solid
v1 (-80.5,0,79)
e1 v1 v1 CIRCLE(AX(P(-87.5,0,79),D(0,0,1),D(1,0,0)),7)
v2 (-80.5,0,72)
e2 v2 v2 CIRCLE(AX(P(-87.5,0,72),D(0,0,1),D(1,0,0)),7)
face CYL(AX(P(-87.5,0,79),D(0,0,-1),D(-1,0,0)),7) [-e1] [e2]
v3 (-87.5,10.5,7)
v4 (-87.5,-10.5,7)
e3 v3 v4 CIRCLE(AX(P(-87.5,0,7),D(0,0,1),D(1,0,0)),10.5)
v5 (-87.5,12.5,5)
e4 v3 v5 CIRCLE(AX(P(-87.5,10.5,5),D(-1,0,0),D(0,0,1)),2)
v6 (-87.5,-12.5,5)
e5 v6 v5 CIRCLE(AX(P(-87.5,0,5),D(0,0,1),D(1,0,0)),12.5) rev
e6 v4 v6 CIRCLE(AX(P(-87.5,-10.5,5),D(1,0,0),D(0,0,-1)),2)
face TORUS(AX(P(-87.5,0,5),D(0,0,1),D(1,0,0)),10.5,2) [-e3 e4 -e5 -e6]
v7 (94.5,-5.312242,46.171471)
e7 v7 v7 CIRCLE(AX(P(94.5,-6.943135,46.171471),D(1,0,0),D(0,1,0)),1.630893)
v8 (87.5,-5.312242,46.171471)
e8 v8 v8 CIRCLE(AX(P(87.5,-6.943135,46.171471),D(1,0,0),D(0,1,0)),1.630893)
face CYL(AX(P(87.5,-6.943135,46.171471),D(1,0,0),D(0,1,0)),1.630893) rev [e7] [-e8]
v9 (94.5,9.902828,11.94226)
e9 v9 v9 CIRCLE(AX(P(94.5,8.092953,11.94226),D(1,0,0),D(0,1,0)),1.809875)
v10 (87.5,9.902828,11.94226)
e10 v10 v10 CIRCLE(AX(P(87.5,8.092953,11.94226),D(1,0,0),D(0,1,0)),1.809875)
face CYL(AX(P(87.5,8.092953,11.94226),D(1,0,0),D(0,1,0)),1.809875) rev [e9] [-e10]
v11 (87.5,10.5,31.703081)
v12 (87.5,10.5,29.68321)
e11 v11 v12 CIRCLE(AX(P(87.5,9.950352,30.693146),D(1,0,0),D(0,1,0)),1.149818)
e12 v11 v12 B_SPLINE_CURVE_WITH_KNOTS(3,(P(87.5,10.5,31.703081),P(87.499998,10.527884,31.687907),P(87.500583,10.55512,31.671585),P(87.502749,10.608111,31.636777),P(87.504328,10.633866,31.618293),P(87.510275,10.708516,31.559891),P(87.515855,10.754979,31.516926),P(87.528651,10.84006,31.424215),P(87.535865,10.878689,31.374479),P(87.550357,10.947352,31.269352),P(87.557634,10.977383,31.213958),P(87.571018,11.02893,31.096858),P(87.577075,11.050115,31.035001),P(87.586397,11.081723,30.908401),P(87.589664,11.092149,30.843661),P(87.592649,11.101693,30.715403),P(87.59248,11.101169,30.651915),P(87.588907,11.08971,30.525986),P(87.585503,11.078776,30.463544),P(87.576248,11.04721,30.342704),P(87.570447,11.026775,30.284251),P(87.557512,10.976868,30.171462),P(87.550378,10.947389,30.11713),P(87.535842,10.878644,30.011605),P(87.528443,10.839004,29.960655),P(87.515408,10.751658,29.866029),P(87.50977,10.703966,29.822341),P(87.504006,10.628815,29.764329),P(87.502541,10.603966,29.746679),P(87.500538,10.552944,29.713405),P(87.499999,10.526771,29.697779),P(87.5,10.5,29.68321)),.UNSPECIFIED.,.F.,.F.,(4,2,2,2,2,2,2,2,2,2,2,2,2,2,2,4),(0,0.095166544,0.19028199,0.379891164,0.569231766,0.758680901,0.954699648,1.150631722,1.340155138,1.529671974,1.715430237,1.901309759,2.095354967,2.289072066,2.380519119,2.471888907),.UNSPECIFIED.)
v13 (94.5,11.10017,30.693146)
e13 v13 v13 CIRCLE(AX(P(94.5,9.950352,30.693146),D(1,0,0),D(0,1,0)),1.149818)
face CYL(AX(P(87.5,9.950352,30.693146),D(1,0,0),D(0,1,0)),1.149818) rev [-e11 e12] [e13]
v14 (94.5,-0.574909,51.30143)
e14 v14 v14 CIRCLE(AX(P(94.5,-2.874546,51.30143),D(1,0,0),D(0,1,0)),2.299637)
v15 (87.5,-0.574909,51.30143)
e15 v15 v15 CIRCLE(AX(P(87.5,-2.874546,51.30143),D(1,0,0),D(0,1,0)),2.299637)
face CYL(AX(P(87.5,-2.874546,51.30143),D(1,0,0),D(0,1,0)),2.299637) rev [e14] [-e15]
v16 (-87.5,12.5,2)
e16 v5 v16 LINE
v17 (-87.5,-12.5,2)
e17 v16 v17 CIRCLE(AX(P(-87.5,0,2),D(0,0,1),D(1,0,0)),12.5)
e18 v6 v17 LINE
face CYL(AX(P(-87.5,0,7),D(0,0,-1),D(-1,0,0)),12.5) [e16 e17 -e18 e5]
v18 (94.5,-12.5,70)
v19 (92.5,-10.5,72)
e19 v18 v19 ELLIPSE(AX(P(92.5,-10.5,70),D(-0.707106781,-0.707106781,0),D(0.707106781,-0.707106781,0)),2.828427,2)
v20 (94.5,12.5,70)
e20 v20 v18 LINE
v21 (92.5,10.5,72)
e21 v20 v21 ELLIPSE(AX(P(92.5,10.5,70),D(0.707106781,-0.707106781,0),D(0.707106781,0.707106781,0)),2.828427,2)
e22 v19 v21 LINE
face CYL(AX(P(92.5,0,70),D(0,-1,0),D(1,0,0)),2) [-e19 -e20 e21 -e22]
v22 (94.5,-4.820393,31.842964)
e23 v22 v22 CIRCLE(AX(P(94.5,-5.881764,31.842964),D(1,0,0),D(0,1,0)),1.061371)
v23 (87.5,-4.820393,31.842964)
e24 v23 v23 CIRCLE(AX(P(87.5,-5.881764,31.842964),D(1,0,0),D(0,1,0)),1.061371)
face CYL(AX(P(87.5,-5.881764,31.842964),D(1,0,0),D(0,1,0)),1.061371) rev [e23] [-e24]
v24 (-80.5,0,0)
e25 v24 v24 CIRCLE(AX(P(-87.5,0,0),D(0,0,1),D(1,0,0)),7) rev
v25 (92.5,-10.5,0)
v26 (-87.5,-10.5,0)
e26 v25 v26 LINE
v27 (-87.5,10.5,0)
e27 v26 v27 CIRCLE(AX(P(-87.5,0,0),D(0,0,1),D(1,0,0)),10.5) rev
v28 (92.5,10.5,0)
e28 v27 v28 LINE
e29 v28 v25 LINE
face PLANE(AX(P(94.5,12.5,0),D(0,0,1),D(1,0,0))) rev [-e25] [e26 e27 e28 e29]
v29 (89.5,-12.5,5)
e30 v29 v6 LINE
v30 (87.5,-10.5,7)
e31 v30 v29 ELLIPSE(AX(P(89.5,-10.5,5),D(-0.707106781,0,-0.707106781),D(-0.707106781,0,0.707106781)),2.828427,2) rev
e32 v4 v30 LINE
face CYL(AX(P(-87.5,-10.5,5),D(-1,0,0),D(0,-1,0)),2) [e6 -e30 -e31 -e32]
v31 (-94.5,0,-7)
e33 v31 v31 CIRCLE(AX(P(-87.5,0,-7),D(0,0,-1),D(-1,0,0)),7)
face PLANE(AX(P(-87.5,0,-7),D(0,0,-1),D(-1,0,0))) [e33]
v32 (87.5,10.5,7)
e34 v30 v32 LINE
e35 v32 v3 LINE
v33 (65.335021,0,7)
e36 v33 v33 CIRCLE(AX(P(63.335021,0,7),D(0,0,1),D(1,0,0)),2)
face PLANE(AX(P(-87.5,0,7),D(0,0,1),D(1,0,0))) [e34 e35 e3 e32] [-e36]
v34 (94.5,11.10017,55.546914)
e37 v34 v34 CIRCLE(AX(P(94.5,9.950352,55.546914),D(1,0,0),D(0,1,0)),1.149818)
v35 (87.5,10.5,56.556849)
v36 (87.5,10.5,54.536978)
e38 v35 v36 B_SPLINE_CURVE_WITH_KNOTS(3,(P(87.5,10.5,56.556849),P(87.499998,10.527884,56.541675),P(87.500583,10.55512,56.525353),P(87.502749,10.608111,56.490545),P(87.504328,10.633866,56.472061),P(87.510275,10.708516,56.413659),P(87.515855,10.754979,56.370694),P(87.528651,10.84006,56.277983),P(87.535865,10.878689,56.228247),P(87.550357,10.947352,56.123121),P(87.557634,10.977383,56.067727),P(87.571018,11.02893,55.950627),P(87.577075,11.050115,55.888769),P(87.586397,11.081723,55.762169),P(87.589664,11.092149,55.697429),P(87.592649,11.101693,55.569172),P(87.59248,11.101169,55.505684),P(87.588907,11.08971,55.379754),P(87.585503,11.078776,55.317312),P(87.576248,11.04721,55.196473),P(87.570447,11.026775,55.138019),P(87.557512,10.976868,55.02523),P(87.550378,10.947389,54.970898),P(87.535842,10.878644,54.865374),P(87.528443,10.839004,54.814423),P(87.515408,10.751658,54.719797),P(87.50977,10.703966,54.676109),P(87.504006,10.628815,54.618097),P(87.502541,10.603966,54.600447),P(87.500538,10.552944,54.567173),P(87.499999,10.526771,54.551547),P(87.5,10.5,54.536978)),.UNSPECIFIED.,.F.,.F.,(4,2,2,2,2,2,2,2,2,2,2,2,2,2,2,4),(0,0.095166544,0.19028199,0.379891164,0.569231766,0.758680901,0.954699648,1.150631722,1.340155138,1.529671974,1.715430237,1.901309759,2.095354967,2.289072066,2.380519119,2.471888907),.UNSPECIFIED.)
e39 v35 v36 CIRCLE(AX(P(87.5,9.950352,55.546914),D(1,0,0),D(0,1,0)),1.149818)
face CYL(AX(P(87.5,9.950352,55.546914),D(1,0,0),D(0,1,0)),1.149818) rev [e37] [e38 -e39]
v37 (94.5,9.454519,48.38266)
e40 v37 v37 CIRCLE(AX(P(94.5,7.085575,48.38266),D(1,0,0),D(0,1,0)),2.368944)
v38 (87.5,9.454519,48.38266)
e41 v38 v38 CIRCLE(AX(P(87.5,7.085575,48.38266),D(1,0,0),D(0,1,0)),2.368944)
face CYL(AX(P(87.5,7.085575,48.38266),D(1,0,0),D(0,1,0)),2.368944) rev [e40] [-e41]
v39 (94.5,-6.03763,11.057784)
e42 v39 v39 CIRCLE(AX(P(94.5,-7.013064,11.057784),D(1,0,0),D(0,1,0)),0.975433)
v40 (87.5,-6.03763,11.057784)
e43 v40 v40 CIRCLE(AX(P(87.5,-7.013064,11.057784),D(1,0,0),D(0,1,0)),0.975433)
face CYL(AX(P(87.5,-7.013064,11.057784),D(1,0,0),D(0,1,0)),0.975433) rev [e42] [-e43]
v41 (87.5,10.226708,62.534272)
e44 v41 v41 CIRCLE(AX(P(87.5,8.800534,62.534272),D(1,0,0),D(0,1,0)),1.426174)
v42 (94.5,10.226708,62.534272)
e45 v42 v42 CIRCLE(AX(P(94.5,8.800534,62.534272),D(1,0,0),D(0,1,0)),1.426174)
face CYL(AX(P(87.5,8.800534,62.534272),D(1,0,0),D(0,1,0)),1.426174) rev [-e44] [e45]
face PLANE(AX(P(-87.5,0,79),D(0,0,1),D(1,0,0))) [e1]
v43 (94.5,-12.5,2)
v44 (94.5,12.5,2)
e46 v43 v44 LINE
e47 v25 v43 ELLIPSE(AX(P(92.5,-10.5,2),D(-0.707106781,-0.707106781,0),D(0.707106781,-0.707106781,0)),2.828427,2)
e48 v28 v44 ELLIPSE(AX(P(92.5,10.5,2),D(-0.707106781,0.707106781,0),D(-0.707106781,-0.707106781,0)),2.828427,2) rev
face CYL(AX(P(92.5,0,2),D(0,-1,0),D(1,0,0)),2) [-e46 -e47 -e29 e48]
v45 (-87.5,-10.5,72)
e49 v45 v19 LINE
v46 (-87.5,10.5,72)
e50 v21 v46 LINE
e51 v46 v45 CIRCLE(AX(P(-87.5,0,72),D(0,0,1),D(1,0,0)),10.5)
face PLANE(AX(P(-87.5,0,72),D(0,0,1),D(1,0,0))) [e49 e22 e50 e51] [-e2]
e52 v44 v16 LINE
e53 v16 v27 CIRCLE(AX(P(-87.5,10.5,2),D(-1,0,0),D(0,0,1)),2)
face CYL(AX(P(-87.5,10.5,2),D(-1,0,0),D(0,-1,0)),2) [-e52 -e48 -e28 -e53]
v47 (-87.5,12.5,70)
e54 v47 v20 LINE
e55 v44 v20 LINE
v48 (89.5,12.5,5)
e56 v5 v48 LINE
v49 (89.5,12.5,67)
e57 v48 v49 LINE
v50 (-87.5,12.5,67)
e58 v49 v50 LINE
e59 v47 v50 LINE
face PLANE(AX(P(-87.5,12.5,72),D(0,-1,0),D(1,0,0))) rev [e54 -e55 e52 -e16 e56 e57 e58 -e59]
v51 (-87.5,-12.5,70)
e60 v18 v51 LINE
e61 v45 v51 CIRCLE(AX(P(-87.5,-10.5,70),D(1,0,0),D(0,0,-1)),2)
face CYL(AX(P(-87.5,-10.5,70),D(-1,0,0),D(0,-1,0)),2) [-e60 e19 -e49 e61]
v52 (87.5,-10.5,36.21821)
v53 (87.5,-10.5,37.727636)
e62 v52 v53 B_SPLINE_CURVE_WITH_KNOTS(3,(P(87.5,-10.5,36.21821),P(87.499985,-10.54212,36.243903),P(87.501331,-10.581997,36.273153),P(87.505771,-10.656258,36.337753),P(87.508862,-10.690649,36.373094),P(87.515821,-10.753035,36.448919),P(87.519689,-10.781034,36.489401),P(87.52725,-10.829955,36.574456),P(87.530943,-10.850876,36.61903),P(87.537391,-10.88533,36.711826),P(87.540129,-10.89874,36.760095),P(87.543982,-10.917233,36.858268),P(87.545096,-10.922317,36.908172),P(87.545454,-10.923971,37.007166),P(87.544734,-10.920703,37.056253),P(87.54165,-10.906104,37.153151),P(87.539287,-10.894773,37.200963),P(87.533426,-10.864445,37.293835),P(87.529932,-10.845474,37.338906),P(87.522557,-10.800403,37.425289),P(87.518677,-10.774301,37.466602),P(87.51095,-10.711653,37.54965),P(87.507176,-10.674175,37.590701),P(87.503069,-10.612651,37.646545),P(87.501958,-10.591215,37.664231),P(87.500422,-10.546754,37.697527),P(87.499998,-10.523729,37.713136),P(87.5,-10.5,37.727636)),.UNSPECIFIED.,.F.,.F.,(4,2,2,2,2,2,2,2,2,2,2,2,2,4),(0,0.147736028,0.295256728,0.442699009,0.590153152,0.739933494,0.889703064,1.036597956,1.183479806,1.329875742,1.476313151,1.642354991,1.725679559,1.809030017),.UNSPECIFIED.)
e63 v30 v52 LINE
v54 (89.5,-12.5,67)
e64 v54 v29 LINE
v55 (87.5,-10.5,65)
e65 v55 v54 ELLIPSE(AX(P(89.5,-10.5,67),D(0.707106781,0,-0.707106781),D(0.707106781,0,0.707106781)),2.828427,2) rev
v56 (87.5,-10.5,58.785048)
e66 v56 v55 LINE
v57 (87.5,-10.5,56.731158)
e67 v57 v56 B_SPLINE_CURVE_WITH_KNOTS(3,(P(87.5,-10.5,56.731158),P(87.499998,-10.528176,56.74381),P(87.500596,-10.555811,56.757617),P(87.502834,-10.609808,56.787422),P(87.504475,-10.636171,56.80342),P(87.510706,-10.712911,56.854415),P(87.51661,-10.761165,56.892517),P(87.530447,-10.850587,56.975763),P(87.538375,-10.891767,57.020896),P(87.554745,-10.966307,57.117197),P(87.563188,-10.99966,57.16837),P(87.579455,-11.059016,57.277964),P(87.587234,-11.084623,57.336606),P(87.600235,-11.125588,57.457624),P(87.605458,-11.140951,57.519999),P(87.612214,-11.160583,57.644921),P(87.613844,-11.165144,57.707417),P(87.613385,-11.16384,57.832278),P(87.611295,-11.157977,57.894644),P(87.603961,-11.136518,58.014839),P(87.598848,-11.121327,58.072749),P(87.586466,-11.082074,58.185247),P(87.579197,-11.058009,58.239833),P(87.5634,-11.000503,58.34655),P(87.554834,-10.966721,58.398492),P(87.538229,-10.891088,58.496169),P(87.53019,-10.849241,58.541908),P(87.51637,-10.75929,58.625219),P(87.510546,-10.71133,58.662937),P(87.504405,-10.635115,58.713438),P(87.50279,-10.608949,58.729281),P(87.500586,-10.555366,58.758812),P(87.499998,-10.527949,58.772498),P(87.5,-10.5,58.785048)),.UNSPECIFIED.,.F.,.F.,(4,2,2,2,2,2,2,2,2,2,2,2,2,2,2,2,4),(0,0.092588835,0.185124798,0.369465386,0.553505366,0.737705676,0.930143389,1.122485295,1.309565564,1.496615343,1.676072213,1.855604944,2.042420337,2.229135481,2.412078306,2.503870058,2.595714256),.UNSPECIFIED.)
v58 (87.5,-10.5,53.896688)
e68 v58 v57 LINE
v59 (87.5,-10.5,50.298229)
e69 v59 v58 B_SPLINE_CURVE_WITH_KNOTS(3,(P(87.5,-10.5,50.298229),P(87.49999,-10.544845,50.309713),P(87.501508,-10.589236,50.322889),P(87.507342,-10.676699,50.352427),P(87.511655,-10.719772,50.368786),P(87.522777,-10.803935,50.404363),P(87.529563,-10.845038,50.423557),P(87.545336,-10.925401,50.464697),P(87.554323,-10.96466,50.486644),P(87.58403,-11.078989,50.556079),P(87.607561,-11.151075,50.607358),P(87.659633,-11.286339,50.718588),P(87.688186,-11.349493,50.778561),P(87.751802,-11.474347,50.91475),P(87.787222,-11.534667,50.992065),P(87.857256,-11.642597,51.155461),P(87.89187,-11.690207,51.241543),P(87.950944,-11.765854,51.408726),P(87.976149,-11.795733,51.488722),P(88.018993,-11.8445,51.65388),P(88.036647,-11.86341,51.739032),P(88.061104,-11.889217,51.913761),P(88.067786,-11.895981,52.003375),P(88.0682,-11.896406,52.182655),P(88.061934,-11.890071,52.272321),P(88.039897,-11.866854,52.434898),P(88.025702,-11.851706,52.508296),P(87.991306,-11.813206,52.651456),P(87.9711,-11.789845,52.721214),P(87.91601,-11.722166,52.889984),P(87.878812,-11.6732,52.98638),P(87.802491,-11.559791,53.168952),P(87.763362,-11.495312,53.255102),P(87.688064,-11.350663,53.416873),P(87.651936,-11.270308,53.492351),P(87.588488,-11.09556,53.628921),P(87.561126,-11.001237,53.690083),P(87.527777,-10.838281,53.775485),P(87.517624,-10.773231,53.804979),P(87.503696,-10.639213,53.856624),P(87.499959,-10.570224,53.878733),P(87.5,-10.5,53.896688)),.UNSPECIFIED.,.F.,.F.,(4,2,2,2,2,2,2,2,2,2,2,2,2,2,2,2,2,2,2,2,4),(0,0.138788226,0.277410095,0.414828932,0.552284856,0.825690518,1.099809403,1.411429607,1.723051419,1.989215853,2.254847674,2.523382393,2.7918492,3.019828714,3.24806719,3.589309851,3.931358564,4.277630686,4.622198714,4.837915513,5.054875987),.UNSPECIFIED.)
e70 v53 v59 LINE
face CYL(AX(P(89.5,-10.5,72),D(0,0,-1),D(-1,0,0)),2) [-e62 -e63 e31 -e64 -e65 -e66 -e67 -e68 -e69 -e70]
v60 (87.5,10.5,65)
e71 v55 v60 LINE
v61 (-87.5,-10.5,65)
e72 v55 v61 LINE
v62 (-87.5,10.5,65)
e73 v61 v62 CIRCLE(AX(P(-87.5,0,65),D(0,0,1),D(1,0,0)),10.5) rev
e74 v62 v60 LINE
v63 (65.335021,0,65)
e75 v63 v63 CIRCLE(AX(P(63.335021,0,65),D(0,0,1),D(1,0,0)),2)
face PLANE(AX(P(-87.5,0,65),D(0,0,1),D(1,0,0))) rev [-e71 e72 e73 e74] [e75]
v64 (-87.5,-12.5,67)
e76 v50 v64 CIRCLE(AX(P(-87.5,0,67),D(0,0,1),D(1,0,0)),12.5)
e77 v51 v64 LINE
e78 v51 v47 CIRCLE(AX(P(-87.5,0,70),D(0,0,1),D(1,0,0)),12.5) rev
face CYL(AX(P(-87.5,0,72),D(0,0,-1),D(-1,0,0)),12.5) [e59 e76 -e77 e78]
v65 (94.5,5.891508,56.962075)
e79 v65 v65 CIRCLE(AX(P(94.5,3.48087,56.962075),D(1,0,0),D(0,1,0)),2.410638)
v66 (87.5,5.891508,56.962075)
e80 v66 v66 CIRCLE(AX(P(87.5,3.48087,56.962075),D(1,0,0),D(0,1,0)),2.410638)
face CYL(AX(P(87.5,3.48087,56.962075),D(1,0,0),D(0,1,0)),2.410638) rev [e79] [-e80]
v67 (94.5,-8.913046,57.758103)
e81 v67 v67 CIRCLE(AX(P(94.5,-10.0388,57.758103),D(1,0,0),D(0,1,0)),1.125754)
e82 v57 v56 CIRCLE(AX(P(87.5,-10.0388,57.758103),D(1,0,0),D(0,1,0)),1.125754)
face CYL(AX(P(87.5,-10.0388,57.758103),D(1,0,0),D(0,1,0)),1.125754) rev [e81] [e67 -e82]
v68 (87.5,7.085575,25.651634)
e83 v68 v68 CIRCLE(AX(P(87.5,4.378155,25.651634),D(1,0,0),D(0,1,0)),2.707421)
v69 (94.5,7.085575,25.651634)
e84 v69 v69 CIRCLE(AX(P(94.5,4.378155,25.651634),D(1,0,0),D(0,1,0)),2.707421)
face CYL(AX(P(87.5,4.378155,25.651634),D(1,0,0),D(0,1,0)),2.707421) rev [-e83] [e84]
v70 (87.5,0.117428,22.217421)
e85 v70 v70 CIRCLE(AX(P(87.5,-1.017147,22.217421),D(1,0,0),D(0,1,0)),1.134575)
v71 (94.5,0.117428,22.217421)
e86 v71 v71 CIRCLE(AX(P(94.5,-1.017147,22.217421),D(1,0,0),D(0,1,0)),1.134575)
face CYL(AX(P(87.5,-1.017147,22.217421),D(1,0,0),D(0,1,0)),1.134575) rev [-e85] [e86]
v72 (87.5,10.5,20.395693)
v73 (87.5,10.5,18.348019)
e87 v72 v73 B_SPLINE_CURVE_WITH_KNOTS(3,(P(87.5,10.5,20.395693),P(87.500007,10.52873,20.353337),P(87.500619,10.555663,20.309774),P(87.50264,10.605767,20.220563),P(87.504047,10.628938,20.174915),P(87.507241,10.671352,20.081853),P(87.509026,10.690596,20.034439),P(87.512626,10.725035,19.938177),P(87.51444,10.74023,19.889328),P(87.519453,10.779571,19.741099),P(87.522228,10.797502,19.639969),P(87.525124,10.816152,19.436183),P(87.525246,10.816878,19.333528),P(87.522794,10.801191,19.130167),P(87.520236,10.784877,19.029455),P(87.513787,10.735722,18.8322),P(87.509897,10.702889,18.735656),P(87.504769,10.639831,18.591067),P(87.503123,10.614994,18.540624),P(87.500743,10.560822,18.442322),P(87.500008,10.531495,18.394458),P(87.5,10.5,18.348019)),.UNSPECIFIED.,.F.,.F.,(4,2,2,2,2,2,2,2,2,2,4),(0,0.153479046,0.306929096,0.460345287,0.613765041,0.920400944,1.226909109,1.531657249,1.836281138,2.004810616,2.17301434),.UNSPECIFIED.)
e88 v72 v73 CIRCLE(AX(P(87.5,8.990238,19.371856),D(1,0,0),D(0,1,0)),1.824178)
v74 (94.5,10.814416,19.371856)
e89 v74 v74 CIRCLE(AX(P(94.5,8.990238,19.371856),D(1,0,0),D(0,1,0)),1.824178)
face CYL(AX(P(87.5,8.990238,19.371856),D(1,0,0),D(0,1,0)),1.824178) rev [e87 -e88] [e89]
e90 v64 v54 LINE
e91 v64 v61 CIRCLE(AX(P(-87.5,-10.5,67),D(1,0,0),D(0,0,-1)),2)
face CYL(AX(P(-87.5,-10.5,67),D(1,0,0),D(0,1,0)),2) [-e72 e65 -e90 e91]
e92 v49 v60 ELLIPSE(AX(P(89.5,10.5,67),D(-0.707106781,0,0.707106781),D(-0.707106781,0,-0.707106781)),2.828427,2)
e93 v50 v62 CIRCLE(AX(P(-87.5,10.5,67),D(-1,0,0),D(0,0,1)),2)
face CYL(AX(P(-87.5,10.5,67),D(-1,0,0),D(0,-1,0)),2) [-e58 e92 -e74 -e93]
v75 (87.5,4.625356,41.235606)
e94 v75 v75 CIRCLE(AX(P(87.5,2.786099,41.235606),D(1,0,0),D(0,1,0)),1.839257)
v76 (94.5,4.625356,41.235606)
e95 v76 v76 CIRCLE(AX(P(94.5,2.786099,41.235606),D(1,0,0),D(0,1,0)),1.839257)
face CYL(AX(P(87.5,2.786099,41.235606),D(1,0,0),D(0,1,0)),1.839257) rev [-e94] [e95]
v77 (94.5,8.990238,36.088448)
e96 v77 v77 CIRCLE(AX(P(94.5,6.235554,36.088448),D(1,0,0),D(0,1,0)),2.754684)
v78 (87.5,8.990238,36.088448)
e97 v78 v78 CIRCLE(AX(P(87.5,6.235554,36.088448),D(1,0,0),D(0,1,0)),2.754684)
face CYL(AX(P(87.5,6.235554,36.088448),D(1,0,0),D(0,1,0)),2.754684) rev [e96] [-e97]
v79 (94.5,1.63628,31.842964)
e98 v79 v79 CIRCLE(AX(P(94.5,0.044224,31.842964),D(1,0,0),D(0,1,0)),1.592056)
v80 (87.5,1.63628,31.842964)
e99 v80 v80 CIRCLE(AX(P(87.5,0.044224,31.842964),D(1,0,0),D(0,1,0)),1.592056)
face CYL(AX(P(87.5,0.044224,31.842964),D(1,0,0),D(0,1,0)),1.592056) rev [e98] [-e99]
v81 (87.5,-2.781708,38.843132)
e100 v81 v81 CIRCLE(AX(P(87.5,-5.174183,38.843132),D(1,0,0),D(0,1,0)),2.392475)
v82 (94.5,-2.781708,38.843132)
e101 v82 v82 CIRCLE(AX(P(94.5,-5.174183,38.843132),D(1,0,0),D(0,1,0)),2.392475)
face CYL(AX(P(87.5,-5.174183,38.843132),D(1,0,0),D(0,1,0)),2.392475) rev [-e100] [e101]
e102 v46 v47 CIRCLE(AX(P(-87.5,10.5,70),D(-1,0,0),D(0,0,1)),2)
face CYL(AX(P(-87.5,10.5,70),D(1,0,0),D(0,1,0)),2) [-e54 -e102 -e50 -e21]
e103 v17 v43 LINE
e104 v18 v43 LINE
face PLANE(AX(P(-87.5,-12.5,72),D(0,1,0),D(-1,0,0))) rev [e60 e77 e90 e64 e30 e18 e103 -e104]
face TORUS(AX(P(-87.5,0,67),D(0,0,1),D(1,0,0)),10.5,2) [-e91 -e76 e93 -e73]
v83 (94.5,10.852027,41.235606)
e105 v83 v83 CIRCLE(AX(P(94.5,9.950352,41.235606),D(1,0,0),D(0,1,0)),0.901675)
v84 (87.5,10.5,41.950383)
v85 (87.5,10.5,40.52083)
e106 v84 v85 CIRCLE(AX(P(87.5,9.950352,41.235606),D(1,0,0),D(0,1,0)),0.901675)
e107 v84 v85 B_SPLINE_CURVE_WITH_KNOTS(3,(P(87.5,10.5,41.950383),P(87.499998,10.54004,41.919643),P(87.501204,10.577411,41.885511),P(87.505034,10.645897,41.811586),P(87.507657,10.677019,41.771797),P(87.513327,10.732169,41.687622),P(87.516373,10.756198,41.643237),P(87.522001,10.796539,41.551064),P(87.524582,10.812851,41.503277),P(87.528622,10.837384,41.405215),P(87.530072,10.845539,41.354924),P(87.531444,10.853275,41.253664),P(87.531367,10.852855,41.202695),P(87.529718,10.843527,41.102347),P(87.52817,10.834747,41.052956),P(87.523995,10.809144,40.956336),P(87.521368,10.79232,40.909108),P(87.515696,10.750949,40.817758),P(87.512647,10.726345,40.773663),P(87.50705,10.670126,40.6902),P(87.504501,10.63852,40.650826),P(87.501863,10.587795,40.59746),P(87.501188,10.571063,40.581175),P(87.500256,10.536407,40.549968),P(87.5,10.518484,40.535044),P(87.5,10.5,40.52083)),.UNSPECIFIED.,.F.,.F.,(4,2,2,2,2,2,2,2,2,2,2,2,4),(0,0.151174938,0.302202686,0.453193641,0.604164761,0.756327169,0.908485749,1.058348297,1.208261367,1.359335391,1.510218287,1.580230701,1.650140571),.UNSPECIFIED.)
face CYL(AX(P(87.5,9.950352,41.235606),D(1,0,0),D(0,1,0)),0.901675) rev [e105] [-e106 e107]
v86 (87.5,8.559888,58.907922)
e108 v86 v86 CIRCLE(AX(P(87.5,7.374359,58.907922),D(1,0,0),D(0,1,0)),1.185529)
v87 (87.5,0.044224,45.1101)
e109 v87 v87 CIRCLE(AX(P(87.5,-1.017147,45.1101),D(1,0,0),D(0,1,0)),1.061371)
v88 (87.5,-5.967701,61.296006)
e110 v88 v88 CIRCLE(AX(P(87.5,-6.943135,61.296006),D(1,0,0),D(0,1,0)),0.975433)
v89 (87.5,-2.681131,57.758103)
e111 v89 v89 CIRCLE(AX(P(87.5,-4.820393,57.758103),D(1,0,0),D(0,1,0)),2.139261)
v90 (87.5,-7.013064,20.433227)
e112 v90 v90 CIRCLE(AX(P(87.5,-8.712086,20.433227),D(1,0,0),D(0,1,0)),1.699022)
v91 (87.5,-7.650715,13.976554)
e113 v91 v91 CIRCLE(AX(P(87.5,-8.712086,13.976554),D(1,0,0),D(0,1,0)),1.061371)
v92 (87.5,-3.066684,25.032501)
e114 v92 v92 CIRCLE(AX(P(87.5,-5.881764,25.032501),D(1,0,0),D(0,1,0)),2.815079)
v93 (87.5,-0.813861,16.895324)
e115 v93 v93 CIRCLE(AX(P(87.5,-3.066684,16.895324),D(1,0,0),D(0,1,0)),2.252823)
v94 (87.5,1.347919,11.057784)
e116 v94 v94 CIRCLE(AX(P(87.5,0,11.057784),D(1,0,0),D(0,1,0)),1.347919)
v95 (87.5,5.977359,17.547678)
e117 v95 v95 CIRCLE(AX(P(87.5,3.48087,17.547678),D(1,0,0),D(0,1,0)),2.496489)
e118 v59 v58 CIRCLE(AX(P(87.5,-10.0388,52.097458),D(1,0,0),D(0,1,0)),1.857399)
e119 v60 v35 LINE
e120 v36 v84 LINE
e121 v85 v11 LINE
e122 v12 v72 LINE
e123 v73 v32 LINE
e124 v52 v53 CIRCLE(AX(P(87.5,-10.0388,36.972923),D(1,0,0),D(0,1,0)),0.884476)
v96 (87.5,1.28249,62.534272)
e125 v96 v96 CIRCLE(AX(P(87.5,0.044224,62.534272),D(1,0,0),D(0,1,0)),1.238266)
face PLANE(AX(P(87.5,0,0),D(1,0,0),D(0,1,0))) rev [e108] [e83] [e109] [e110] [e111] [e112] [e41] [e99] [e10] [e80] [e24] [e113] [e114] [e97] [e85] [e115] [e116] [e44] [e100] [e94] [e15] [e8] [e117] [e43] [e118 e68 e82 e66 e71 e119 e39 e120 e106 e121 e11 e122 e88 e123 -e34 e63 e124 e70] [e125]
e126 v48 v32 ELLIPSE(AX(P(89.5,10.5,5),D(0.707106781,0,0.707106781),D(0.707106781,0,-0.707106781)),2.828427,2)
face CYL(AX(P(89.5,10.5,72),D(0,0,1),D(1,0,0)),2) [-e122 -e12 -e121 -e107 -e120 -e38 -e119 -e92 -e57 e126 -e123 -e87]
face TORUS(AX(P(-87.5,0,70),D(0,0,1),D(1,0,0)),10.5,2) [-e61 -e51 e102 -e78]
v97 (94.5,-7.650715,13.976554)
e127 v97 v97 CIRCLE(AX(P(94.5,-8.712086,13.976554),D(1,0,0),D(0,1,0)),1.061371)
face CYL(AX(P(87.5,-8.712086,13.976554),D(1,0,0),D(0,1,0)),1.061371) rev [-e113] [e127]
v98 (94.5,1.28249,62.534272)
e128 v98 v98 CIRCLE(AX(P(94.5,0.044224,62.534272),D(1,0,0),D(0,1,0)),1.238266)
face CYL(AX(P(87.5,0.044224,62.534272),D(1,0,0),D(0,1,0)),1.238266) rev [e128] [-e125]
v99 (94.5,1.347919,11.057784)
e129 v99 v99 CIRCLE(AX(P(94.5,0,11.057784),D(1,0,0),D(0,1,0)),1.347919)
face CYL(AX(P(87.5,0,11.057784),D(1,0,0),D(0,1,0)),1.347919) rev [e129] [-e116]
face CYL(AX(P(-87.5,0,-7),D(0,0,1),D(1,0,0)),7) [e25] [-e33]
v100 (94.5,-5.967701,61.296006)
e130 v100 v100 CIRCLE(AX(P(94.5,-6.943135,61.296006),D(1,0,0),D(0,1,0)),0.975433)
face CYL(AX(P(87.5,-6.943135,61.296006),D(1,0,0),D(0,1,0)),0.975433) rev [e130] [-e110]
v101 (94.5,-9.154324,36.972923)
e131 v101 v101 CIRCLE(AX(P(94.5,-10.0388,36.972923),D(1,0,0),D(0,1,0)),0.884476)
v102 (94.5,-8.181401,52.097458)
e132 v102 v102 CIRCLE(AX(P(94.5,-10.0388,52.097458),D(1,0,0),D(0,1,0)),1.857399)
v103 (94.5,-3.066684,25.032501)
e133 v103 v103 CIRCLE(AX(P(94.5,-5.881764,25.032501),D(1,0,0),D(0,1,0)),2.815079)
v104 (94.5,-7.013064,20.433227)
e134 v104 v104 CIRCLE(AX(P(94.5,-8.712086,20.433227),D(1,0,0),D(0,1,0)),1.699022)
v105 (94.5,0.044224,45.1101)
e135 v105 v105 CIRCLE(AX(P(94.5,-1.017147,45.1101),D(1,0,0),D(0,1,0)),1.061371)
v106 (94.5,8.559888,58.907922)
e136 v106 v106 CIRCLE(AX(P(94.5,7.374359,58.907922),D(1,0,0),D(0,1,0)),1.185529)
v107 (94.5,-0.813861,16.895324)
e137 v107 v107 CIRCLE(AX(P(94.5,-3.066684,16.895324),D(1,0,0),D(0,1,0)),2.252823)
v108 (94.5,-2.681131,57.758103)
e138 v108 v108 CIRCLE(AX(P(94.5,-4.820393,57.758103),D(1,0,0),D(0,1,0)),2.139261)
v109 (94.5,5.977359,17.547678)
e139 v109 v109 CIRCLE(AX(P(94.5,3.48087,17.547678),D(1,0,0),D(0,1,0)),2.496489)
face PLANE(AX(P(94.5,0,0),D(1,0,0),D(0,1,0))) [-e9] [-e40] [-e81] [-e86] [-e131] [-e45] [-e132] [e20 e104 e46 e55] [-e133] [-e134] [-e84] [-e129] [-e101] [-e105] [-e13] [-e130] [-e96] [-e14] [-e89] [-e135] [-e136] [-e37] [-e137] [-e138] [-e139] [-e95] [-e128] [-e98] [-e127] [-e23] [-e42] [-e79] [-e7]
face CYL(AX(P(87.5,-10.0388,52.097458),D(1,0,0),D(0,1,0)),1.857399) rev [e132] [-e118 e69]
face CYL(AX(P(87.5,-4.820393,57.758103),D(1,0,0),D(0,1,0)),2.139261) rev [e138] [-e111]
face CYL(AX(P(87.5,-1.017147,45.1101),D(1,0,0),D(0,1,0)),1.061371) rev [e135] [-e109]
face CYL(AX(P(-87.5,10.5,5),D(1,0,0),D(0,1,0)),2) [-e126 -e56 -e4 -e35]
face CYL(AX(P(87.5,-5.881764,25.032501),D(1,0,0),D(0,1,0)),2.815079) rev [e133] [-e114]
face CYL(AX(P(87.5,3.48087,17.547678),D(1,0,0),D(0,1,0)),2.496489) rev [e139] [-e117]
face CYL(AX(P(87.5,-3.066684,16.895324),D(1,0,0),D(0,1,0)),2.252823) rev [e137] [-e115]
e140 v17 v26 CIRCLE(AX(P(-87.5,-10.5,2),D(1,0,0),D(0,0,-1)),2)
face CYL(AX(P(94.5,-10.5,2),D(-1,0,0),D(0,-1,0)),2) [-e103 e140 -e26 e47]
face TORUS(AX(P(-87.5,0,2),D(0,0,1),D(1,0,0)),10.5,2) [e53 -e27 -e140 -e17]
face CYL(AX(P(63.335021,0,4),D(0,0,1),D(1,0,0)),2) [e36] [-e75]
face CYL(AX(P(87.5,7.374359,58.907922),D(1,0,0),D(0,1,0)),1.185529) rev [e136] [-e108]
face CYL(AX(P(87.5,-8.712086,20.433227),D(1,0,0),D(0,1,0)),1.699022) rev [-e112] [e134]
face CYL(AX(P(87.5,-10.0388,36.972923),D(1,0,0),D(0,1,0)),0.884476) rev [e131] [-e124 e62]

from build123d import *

# Parameters (mm, degrees)
BOSS_EXTRUDE1_DEPTH = 7
BOSS_EXTRUDE2_DEPTH = 7
SKETCH4_R           = 7
BOSS_EXTRUDE3_DEPTH = 7
SKETCH5_R           = 7
BOSS_EXTRUDE4_DEPTH = 7
SKETCH6_W           = 15.675123076
SKETCH6_H           = 25
CUT_EXTRUDE1_DEPTH  = 129.051747352
SKETCH7_W           = 72
SKETCH7_H           = 25
BOSS_EXTRUDE5_DEPTH = 7
SKETCH8_R           = 1.061370883
SKETCH8_R_2         = 1.592056325
SKETCH8_R_3         = 2.707420536
SKETCH8_R_4         = 2.754684025
SKETCH8_R_5         = 2.368943822
SKETCH8_R_6         = 2.299636914
SKETCH8_R_7         = 2.392474711
SKETCH8_R_8         = 2.815079383
SKETCH8_R_9         = 1.134575484
SKETCH8_R_10        = 1.630892674
SKETCH8_R_11        = 2.410638363
SKETCH8_R_12        = 2.139261407
SKETCH8_R_13        = 1.839257189
SKETCH8_R_14        = 1.824177684
SKETCH8_R_15        = 2.496489188
SKETCH8_R_16        = 2.252823118
SKETCH8_R_17        = 1.347918968
SKETCH8_R_18        = 1.149818457
SKETCH8_R_19        = 0.901675203
SKETCH8_R_20        = 0.884475736
SKETCH8_R_21        = 1.857399046
SKETCH8_R_22        = 1.699022407
SKETCH8_R_23        = 1.809875359
SKETCH8_R_24        = 0.975433155
SKETCH8_R_25        = 1.238266031
SKETCH8_R_26        = 1.426174271
SKETCH8_R_27        = 1.185528831
SKETCH8_R_28        = 1.125753823
CUT_EXTRUDE2_DEPTH  = 7
FILLET1_R           = 2
SKETCH9_R           = 2
BOSS_EXTRUDE6_DEPTH = 68


with BuildPart() as part:
    # Sketch1 → Boss-Extrude1 (new body)
    with BuildSketch(Plane.XY):
        with BuildLine():
            Line((-87.5, 12.5), (87.5, 12.5))
            ThreePointArc((87.5, 12.5), (100, 0), (87.5, -12.5))
            Line((87.5, -12.5), (-87.5, -12.5))
            ThreePointArc((-87.5, -12.5), (-100, 0), (-87.5, 12.5))
        make_face()
    extrude(amount=BOSS_EXTRUDE1_DEPTH)

    # Sketch5 → Boss-Extrude4 (add)
    with BuildSketch(Plane(origin=(0, 0, 0), x_dir=(-1, 0, 0), z_dir=(0, 0, -1))):
        with Locations(Location((87.5, 0, 0), (0, 0, 180))):
            Circle(SKETCH5_R)
    extrude(amount=BOSS_EXTRUDE4_DEPTH)


with BuildPart() as body_2:
    # Sketch3 → Boss-Extrude2 (new body)
    with BuildSketch(Plane.XY.offset(65)):
        with BuildLine():
            Line((-87.5, 12.5), (87.5, 12.5))
            ThreePointArc((87.5, 12.5), (100, 0), (87.5, -12.5))
            Line((87.5, -12.5), (-87.5, -12.5))
            ThreePointArc((-87.5, -12.5), (-100, 0), (-87.5, 12.5))
        make_face()
    extrude(amount=BOSS_EXTRUDE2_DEPTH)

    # Sketch4 → Boss-Extrude3 (add)
    with BuildSketch(Plane.XY.offset(72)):
        with Locations((-87.5, 0)):
            Circle(SKETCH4_R)
    extrude(amount=BOSS_EXTRUDE3_DEPTH)


with BuildPart() as cut_extrude1_tool:
    # Sketch6 → Cut-Extrude1 (new, through all)
    with BuildSketch(Plane.XY):
        with Locations((95.337561538, 0)):
            Rectangle(SKETCH6_W, SKETCH6_H)
    extrude(amount=CUT_EXTRUDE1_DEPTH)


with BuildPart() as part_1:
    add(part.part)

    # Cut-Extrude1: cut by cut_extrude1_tool
    add(cut_extrude1_tool.part, mode=Mode.SUBTRACT)



with BuildPart() as body_2_1:
    add(body_2.part)

    # Cut-Extrude1: cut by cut_extrude1_tool
    add(cut_extrude1_tool.part, mode=Mode.SUBTRACT)


with BuildPart() as part_2:
    add(part_1.part)

    add(body_2_1.part)  # Boss-Extrude5 merges body 2
    # Sketch7 → Boss-Extrude5 (add)
    with BuildSketch(Plane(origin=(87.5, 0, 0), x_dir=(0, 0, -1), z_dir=(1, 0, 0))):
        with Locations((-36, 0)):
            Rectangle(SKETCH7_W, SKETCH7_H)
    extrude(amount=BOSS_EXTRUDE5_DEPTH)

    # Sketch8 → Cut-Extrude2 (cut)
    with BuildSketch(Plane(origin=(94.5, 0, 0), x_dir=(0, 0, -1), z_dir=(1, 0, 0))):
        with Locations(Location((-45.110100082, -1.017147097, 0), (0, 0, 90))):
            Circle(SKETCH8_R)
        with Locations(Location((-31.84296404, 0.044223787, 0), (0, 0, 90))):
            Circle(SKETCH8_R_2)
        with Locations(Location((-25.651633888, 4.378154894, 0), (0, 0, 90))):
            Circle(SKETCH8_R_3)
        with Locations(Location((-36.088447574, 6.23555394, 0), (0, 0, 90))):
            Circle(SKETCH8_R_4)
        with Locations(Location((-48.382660305, 7.08557543, 0), (0, 0, 90))):
            Circle(SKETCH8_R_5)
        with Locations(Location((-51.301430235, -2.874546142, 0), (0, 0, 90))):
            Circle(SKETCH8_R_6)
        with Locations(Location((-38.843131599, -5.174183056, 0), (0, 0, 90))):
            Circle(SKETCH8_R_7)
        with Locations(Location((-25.032500872, -5.881763645, 0), (0, 0, 90))):
            Circle(SKETCH8_R_8)
        with Locations(Location((-22.21742149, -1.017147097, 0), (0, 0, 90))):
            Circle(SKETCH8_R_9)
        with Locations(Location((-31.84296404, -5.881763645, 0), (0, 0, 90))):
            Circle(SKETCH8_R)
        with Locations(Location((-46.171470965, -6.943134528, 0), (0, 0, 90))):
            Circle(SKETCH8_R_10)
        with Locations(Location((-56.962074946, 3.480869914, 0), (0, 0, 90))):
            Circle(SKETCH8_R_11)
        with Locations(Location((-57.758103108, -4.820392762, 0), (0, 0, 90))):
            Circle(SKETCH8_R_12)
        with Locations(Location((-41.23560631, 2.786098569, 0), (0, 0, 90))):
            Circle(SKETCH8_R_13)
        with Locations(Location((-19.371856161, 8.990237965, 0), (0, 0, 90))):
            Circle(SKETCH8_R_14)
        with Locations(Location((-17.547678478, 3.480869914, 0), (0, 0, 90))):
            Circle(SKETCH8_R_15)
        with Locations(Location((-16.8953241, -3.066684263, 0), (0, 0, 90))):
            Circle(SKETCH8_R_16)
        with Locations(Location((-13.976554171, -8.712086001, 0), (0, 0, 90))):
            Circle(SKETCH8_R)
        with Locations(Location((-11.057784242, 0, 0), (0, 0, 90))):
            Circle(SKETCH8_R_17)
        with Locations(Location((-30.693145583, 9.950352031, 0), (0, 0, 90))):
            Circle(SKETCH8_R_18)
        with Locations(Location((-41.23560631, 9.950352031, 0), (0, 0, 90))):
            Circle(SKETCH8_R_19)
        with Locations(Location((-55.546913768, 9.950352031, 0), (0, 0, 90))):
            Circle(SKETCH8_R_18)
        with Locations(Location((-36.97292331, -10.038799605, 0), (0, 0, 90))):
            Circle(SKETCH8_R_20)
        with Locations(Location((-52.097458397, -10.038799605, 0), (0, 0, 90))):
            Circle(SKETCH8_R_21)
        with Locations(Location((-20.433227045, -8.712086001, 0), (0, 0, 90))):
            Circle(SKETCH8_R_22)
        with Locations(Location((-11.942259978, 8.092952985, 0), (0, 0, 90))):
            Circle(SKETCH8_R_23)
        with Locations(Location((-11.057784242, -7.013063594, 0), (0, 0, 90))):
            Circle(SKETCH8_R_24)
        with Locations(Location((-62.534272083, 0.044223787, 0), (0, 0, 90))):
            Circle(SKETCH8_R_25)
        with Locations(Location((-61.296006052, -6.943134528, 0), (0, 0, 90))):
            Circle(SKETCH8_R_24)
        with Locations(Location((-62.534272083, 8.800533574, 0), (0, 0, 90))):
            Circle(SKETCH8_R_26)
        with Locations(Location((-58.907921565, 7.374359303, 0), (0, 0, 90))):
            Circle(SKETCH8_R_27)
        with Locations(Location((-57.758103108, -10.038799605, 0), (0, 0, 90))):
            Circle(SKETCH8_R_28)
    extrude(amount=-CUT_EXTRUDE2_DEPTH, mode=Mode.SUBTRACT)

    # Fillet1
    # the kernel refuses this fillet: 2 mm, written as the material it takes off along each edge
    with BuildSketch(Plane(origin=(-87.5, 12.5, 72), x_dir=(0, 0, -1), z_dir=(1, 0, 0)), Plane(origin=(99.5, -12.5, 0), x_dir=(0, 1, 0), z_dir=(-1, 0, 0)), Plane(origin=(99.5, 12.5, 0), x_dir=(0, 0, 1), z_dir=(-1, 0, 0)), Plane(origin=(-87.5, -12.5, 72), x_dir=(0, 1, 0), z_dir=(1, 0, 0))) as fillet1_piece_1:
        with BuildLine():
            CenterArc((FILLET1_R, -FILLET1_R), FILLET1_R, 90, 90)
            Line((0, -FILLET1_R), (0, 0))
            Line((0, 0), (FILLET1_R, 0))
        make_face()
    extrude(amount=187, mode=Mode.SUBTRACT)
    with BuildSketch(Plane(origin=(87.5, -12.5, 7), x_dir=(0, 1, 0), z_dir=(0, 0, 1))) as fillet1_piece_2:
        with BuildLine():
            CenterArc((FILLET1_R, -FILLET1_R), FILLET1_R, 90, 90)
            Line((0, -FILLET1_R), (0, 0))
            Line((0, 0), (FILLET1_R, 0))
        make_face()
    extrude(amount=58, mode=Mode.SUBTRACT)
    with BuildSketch(Plane(origin=(94.5, -17.5, 72), x_dir=(-1, 0, 0), z_dir=(0, 1, 0))) as fillet1_piece_3:
        with BuildLine():
            CenterArc((FILLET1_R, -FILLET1_R), FILLET1_R, 90, 90)
            Line((0, -FILLET1_R), (0, 0))
            Line((0, 0), (FILLET1_R, 0))
        make_face()
    extrude(amount=35, mode=Mode.SUBTRACT)
    with BuildSketch(Plane(origin=(94.5, 17.5, 0), x_dir=(0, 0, 1), z_dir=(0, -1, 0))) as fillet1_piece_4:
        with BuildLine():
            CenterArc((FILLET1_R, FILLET1_R), FILLET1_R, 180, 90)
            Line((0, FILLET1_R), (0, 0))
            Line((0, 0), (FILLET1_R, 0))
        make_face()
    extrude(amount=35, mode=Mode.SUBTRACT)
    with BuildSketch(Plane(origin=(-87.5, 0, 72), x_dir=(0, -1, 0), z_dir=(1, 0, 0))) as fillet1_piece_5:
        with BuildLine():
            CenterArc((12.5 - FILLET1_R, FILLET1_R), FILLET1_R, 270, 90)
            Line((12.5 - FILLET1_R, 0), (12.5, 0))
            Line((12.5, 0), (12.5, FILLET1_R))
        make_face()
    revolve(axis=Axis((-87.5, 0, 72), (0, 0, -1)), revolution_arc=180, mode=Mode.SUBTRACT)
    with BuildSketch(Plane(origin=(87.5, 12.5, 65), x_dir=(1, 0, 0), z_dir=(0, 0, -1))) as fillet1_piece_6:
        with BuildLine():
            CenterArc((FILLET1_R, FILLET1_R), FILLET1_R, 180, 90)
            Line((0, FILLET1_R), (0, 0))
            Line((0, 0), (FILLET1_R, 0))
        make_face()
    extrude(amount=58, mode=Mode.SUBTRACT)
    with BuildSketch(Plane(origin=(-87.5, 12.5, 65), x_dir=(0, 0, 1), z_dir=(1, 0, 0)), Plane(origin=(87.5, -12.5, 7), x_dir=(0, 1, 0), z_dir=(-1, 0, 0))) as fillet1_piece_7:
        with BuildLine():
            CenterArc((FILLET1_R, FILLET1_R), FILLET1_R, 180, 90)
            Line((0, FILLET1_R), (0, 0))
            Line((0, 0), (FILLET1_R, 0))
        make_face()
    extrude(amount=175, mode=Mode.SUBTRACT)
    with BuildSketch(Plane(origin=(-87.5, 12.5, 7), x_dir=(0, 0, -1), z_dir=(1, 0, 0)), Plane(origin=(87.5, -12.5, 65), x_dir=(0, 1, 0), z_dir=(-1, 0, 0))) as fillet1_piece_8:
        with BuildLine():
            CenterArc((FILLET1_R, -FILLET1_R), FILLET1_R, 90, 90)
            Line((0, -FILLET1_R), (0, 0))
            Line((0, 0), (FILLET1_R, 0))
        make_face()
    extrude(amount=175, mode=Mode.SUBTRACT)
    with BuildSketch(Plane(origin=(-87.5, 0, 7), x_dir=(0, -1, 0), z_dir=(1, 0, 0))) as fillet1_piece_9:
        with BuildLine():
            CenterArc((12.5 - FILLET1_R, FILLET1_R), FILLET1_R, 270, 90)
            Line((12.5 - FILLET1_R, 0), (12.5, 0))
            Line((12.5, 0), (12.5, FILLET1_R))
        make_face()
    revolve(axis=Axis((-87.5, 0, 7), (0, 0, -1)), revolution_arc=180, mode=Mode.SUBTRACT)
    with BuildSketch(Plane(origin=(-87.5, 0, 0), x_dir=(0, -1, 0), z_dir=(1, 0, 0))) as fillet1_piece_10:
        with BuildLine():
            CenterArc((12.5 - FILLET1_R, -FILLET1_R), FILLET1_R, 0, 90)
            Line((12.5, -FILLET1_R), (12.5, 0))
            Line((12.5, 0), (12.5 - FILLET1_R, 0))
        make_face()
    revolve(axis=Axis((-87.5, 0, 0), (0, 0, -1)), revolution_arc=180, mode=Mode.SUBTRACT)
    with BuildSketch(Plane(origin=(-87.5, 0, 65), x_dir=(0, -1, 0), z_dir=(1, 0, 0))) as fillet1_piece_11:
        with BuildLine():
            CenterArc((12.5 - FILLET1_R, -FILLET1_R), FILLET1_R, 0, 90)
            Line((12.5 - FILLET1_R, 0), (12.5, 0))
            Line((12.5, 0), (12.5, -FILLET1_R))
        make_face()
    revolve(axis=Axis((-87.5, 0, 65), (0, 0, -1)), revolution_arc=180, mode=Mode.SUBTRACT)
    with BuildSketch(Plane(origin=(92.5, -12.5, 7), x_dir=(0, 1, 0), z_dir=(-1, 0, 0))) as fillet1_piece_12a_section:
        with BuildLine():
            CenterArc((FILLET1_R, FILLET1_R), FILLET1_R, 180, 90)
            Line((0, FILLET1_R), (0, 0))
            Line((0, 0), (FILLET1_R, 0))
        make_face()
    fillet1_piece_12a = extrude(amount=180, mode=Mode.PRIVATE)
    fillet1_piece_12a = split(fillet1_piece_12a, bisect_by=Plane(origin=(87.5, -12.047209771, 6.547209771), z_dir=(1, 0, 0)), keep=Keep.TOP, mode=Mode.PRIVATE)
    with BuildSketch(Plane(origin=(87.5, -12.5, 2), x_dir=(0, 1, 0), z_dir=(0, 0, 1))) as fillet1_piece_12b_section:
        with BuildLine():
            CenterArc((FILLET1_R, -FILLET1_R), FILLET1_R, 90, 90)
            Line((0, -FILLET1_R), (0, 0))
            Line((0, 0), (FILLET1_R, 0))
        make_face()
    fillet1_piece_12b = extrude(amount=63, mode=Mode.PRIVATE)
    fillet1_piece_12b = split(fillet1_piece_12b, bisect_by=Plane(origin=(87.952790229, -12.047209771, 7), z_dir=(0, 0, -1)), keep=Keep.TOP, mode=Mode.PRIVATE)
    fillet1_piece_12 = fillet1_piece_12a & fillet1_piece_12b
    add(fillet1_piece_12, mode=Mode.SUBTRACT)
    with BuildSketch(Plane(origin=(87.5, -12.5, 7), x_dir=(0, 1, 0), z_dir=(0, 0, 1))) as fillet1_piece_13a_section:
        with BuildLine():
            CenterArc((FILLET1_R, -FILLET1_R), FILLET1_R, 90, 90)
            Line((0, -FILLET1_R), (0, 0))
            Line((0, 0), (FILLET1_R, 0))
        make_face()
    fillet1_piece_13a = extrude(amount=63, mode=Mode.PRIVATE)
    fillet1_piece_13a = split(fillet1_piece_13a, bisect_by=Plane(origin=(87.952790229, -12.047209771, 65), z_dir=(0, 0, 1)), keep=Keep.TOP, mode=Mode.PRIVATE)
    with BuildSketch(Plane(origin=(92.5, -12.5, 65), x_dir=(0, 1, 0), z_dir=(-1, 0, 0))) as fillet1_piece_13b_section:
        with BuildLine():
            CenterArc((FILLET1_R, -FILLET1_R), FILLET1_R, 90, 90)
            Line((0, -FILLET1_R), (0, 0))
            Line((0, 0), (FILLET1_R, 0))
        make_face()
    fillet1_piece_13b = extrude(amount=180, mode=Mode.PRIVATE)
    fillet1_piece_13b = split(fillet1_piece_13b, bisect_by=Plane(origin=(87.5, -12.047209771, 65.452790229), z_dir=(1, 0, 0)), keep=Keep.TOP, mode=Mode.PRIVATE)
    fillet1_piece_13 = fillet1_piece_13a & fillet1_piece_13b
    add(fillet1_piece_13, mode=Mode.SUBTRACT)
    with BuildSketch(Plane(origin=(87.5, 12.5, 70), x_dir=(1, 0, 0), z_dir=(0, 0, -1))) as fillet1_piece_14a_section:
        with BuildLine():
            CenterArc((FILLET1_R, FILLET1_R), FILLET1_R, 180, 90)
            Line((0, FILLET1_R), (0, 0))
            Line((0, 0), (FILLET1_R, 0))
        make_face()
    fillet1_piece_14a = extrude(amount=63, mode=Mode.PRIVATE)
    fillet1_piece_14a = split(fillet1_piece_14a, bisect_by=Plane(origin=(87.952790229, 12.047209771, 65), z_dir=(0, 0, 1)), keep=Keep.TOP, mode=Mode.PRIVATE)
    with BuildSketch(Plane(origin=(-87.5, 12.5, 65), x_dir=(0, 0, 1), z_dir=(1, 0, 0))) as fillet1_piece_14b_section:
        with BuildLine():
            CenterArc((FILLET1_R, FILLET1_R), FILLET1_R, 180, 90)
            Line((0, FILLET1_R), (0, 0))
            Line((0, 0), (FILLET1_R, 0))
        make_face()
    fillet1_piece_14b = extrude(amount=180, mode=Mode.PRIVATE)
    fillet1_piece_14b = split(fillet1_piece_14b, bisect_by=Plane(origin=(87.5, 12.047209771, 65.452790229), z_dir=(1, 0, 0)), keep=Keep.TOP, mode=Mode.PRIVATE)
    fillet1_piece_14 = fillet1_piece_14a & fillet1_piece_14b
    add(fillet1_piece_14, mode=Mode.SUBTRACT)
    with BuildSketch(Plane(origin=(-87.5, 12.5, 7), x_dir=(0, 0, -1), z_dir=(1, 0, 0))) as fillet1_piece_15a_section:
        with BuildLine():
            CenterArc((FILLET1_R, -FILLET1_R), FILLET1_R, 90, 90)
            Line((0, -FILLET1_R), (0, 0))
            Line((0, 0), (FILLET1_R, 0))
        make_face()
    fillet1_piece_15a = extrude(amount=180, mode=Mode.PRIVATE)
    fillet1_piece_15a = split(fillet1_piece_15a, bisect_by=Plane(origin=(87.5, 12.047209771, 6.547209771), z_dir=(1, 0, 0)), keep=Keep.TOP, mode=Mode.PRIVATE)
    with BuildSketch(Plane(origin=(87.5, 12.5, 65), x_dir=(1, 0, 0), z_dir=(0, 0, -1))) as fillet1_piece_15b_section:
        with BuildLine():
            CenterArc((FILLET1_R, FILLET1_R), FILLET1_R, 180, 90)
            Line((0, FILLET1_R), (0, 0))
            Line((0, 0), (FILLET1_R, 0))
        make_face()
    fillet1_piece_15b = extrude(amount=63, mode=Mode.PRIVATE)
    fillet1_piece_15b = split(fillet1_piece_15b, bisect_by=Plane(origin=(87.952790229, 12.047209771, 7), z_dir=(0, 0, -1)), keep=Keep.TOP, mode=Mode.PRIVATE)
    fillet1_piece_15 = fillet1_piece_15a & fillet1_piece_15b
    add(fillet1_piece_15, mode=Mode.SUBTRACT)

    # Sketch9 → Boss-Extrude6 (add)
    with BuildSketch(Plane.XY.offset(72)):
        with Locations((63.335020883, 0)):
            Circle(SKETCH9_R)
    extrude(amount=-BOSS_EXTRUDE6_DEPTH)


solid = part_2.part
